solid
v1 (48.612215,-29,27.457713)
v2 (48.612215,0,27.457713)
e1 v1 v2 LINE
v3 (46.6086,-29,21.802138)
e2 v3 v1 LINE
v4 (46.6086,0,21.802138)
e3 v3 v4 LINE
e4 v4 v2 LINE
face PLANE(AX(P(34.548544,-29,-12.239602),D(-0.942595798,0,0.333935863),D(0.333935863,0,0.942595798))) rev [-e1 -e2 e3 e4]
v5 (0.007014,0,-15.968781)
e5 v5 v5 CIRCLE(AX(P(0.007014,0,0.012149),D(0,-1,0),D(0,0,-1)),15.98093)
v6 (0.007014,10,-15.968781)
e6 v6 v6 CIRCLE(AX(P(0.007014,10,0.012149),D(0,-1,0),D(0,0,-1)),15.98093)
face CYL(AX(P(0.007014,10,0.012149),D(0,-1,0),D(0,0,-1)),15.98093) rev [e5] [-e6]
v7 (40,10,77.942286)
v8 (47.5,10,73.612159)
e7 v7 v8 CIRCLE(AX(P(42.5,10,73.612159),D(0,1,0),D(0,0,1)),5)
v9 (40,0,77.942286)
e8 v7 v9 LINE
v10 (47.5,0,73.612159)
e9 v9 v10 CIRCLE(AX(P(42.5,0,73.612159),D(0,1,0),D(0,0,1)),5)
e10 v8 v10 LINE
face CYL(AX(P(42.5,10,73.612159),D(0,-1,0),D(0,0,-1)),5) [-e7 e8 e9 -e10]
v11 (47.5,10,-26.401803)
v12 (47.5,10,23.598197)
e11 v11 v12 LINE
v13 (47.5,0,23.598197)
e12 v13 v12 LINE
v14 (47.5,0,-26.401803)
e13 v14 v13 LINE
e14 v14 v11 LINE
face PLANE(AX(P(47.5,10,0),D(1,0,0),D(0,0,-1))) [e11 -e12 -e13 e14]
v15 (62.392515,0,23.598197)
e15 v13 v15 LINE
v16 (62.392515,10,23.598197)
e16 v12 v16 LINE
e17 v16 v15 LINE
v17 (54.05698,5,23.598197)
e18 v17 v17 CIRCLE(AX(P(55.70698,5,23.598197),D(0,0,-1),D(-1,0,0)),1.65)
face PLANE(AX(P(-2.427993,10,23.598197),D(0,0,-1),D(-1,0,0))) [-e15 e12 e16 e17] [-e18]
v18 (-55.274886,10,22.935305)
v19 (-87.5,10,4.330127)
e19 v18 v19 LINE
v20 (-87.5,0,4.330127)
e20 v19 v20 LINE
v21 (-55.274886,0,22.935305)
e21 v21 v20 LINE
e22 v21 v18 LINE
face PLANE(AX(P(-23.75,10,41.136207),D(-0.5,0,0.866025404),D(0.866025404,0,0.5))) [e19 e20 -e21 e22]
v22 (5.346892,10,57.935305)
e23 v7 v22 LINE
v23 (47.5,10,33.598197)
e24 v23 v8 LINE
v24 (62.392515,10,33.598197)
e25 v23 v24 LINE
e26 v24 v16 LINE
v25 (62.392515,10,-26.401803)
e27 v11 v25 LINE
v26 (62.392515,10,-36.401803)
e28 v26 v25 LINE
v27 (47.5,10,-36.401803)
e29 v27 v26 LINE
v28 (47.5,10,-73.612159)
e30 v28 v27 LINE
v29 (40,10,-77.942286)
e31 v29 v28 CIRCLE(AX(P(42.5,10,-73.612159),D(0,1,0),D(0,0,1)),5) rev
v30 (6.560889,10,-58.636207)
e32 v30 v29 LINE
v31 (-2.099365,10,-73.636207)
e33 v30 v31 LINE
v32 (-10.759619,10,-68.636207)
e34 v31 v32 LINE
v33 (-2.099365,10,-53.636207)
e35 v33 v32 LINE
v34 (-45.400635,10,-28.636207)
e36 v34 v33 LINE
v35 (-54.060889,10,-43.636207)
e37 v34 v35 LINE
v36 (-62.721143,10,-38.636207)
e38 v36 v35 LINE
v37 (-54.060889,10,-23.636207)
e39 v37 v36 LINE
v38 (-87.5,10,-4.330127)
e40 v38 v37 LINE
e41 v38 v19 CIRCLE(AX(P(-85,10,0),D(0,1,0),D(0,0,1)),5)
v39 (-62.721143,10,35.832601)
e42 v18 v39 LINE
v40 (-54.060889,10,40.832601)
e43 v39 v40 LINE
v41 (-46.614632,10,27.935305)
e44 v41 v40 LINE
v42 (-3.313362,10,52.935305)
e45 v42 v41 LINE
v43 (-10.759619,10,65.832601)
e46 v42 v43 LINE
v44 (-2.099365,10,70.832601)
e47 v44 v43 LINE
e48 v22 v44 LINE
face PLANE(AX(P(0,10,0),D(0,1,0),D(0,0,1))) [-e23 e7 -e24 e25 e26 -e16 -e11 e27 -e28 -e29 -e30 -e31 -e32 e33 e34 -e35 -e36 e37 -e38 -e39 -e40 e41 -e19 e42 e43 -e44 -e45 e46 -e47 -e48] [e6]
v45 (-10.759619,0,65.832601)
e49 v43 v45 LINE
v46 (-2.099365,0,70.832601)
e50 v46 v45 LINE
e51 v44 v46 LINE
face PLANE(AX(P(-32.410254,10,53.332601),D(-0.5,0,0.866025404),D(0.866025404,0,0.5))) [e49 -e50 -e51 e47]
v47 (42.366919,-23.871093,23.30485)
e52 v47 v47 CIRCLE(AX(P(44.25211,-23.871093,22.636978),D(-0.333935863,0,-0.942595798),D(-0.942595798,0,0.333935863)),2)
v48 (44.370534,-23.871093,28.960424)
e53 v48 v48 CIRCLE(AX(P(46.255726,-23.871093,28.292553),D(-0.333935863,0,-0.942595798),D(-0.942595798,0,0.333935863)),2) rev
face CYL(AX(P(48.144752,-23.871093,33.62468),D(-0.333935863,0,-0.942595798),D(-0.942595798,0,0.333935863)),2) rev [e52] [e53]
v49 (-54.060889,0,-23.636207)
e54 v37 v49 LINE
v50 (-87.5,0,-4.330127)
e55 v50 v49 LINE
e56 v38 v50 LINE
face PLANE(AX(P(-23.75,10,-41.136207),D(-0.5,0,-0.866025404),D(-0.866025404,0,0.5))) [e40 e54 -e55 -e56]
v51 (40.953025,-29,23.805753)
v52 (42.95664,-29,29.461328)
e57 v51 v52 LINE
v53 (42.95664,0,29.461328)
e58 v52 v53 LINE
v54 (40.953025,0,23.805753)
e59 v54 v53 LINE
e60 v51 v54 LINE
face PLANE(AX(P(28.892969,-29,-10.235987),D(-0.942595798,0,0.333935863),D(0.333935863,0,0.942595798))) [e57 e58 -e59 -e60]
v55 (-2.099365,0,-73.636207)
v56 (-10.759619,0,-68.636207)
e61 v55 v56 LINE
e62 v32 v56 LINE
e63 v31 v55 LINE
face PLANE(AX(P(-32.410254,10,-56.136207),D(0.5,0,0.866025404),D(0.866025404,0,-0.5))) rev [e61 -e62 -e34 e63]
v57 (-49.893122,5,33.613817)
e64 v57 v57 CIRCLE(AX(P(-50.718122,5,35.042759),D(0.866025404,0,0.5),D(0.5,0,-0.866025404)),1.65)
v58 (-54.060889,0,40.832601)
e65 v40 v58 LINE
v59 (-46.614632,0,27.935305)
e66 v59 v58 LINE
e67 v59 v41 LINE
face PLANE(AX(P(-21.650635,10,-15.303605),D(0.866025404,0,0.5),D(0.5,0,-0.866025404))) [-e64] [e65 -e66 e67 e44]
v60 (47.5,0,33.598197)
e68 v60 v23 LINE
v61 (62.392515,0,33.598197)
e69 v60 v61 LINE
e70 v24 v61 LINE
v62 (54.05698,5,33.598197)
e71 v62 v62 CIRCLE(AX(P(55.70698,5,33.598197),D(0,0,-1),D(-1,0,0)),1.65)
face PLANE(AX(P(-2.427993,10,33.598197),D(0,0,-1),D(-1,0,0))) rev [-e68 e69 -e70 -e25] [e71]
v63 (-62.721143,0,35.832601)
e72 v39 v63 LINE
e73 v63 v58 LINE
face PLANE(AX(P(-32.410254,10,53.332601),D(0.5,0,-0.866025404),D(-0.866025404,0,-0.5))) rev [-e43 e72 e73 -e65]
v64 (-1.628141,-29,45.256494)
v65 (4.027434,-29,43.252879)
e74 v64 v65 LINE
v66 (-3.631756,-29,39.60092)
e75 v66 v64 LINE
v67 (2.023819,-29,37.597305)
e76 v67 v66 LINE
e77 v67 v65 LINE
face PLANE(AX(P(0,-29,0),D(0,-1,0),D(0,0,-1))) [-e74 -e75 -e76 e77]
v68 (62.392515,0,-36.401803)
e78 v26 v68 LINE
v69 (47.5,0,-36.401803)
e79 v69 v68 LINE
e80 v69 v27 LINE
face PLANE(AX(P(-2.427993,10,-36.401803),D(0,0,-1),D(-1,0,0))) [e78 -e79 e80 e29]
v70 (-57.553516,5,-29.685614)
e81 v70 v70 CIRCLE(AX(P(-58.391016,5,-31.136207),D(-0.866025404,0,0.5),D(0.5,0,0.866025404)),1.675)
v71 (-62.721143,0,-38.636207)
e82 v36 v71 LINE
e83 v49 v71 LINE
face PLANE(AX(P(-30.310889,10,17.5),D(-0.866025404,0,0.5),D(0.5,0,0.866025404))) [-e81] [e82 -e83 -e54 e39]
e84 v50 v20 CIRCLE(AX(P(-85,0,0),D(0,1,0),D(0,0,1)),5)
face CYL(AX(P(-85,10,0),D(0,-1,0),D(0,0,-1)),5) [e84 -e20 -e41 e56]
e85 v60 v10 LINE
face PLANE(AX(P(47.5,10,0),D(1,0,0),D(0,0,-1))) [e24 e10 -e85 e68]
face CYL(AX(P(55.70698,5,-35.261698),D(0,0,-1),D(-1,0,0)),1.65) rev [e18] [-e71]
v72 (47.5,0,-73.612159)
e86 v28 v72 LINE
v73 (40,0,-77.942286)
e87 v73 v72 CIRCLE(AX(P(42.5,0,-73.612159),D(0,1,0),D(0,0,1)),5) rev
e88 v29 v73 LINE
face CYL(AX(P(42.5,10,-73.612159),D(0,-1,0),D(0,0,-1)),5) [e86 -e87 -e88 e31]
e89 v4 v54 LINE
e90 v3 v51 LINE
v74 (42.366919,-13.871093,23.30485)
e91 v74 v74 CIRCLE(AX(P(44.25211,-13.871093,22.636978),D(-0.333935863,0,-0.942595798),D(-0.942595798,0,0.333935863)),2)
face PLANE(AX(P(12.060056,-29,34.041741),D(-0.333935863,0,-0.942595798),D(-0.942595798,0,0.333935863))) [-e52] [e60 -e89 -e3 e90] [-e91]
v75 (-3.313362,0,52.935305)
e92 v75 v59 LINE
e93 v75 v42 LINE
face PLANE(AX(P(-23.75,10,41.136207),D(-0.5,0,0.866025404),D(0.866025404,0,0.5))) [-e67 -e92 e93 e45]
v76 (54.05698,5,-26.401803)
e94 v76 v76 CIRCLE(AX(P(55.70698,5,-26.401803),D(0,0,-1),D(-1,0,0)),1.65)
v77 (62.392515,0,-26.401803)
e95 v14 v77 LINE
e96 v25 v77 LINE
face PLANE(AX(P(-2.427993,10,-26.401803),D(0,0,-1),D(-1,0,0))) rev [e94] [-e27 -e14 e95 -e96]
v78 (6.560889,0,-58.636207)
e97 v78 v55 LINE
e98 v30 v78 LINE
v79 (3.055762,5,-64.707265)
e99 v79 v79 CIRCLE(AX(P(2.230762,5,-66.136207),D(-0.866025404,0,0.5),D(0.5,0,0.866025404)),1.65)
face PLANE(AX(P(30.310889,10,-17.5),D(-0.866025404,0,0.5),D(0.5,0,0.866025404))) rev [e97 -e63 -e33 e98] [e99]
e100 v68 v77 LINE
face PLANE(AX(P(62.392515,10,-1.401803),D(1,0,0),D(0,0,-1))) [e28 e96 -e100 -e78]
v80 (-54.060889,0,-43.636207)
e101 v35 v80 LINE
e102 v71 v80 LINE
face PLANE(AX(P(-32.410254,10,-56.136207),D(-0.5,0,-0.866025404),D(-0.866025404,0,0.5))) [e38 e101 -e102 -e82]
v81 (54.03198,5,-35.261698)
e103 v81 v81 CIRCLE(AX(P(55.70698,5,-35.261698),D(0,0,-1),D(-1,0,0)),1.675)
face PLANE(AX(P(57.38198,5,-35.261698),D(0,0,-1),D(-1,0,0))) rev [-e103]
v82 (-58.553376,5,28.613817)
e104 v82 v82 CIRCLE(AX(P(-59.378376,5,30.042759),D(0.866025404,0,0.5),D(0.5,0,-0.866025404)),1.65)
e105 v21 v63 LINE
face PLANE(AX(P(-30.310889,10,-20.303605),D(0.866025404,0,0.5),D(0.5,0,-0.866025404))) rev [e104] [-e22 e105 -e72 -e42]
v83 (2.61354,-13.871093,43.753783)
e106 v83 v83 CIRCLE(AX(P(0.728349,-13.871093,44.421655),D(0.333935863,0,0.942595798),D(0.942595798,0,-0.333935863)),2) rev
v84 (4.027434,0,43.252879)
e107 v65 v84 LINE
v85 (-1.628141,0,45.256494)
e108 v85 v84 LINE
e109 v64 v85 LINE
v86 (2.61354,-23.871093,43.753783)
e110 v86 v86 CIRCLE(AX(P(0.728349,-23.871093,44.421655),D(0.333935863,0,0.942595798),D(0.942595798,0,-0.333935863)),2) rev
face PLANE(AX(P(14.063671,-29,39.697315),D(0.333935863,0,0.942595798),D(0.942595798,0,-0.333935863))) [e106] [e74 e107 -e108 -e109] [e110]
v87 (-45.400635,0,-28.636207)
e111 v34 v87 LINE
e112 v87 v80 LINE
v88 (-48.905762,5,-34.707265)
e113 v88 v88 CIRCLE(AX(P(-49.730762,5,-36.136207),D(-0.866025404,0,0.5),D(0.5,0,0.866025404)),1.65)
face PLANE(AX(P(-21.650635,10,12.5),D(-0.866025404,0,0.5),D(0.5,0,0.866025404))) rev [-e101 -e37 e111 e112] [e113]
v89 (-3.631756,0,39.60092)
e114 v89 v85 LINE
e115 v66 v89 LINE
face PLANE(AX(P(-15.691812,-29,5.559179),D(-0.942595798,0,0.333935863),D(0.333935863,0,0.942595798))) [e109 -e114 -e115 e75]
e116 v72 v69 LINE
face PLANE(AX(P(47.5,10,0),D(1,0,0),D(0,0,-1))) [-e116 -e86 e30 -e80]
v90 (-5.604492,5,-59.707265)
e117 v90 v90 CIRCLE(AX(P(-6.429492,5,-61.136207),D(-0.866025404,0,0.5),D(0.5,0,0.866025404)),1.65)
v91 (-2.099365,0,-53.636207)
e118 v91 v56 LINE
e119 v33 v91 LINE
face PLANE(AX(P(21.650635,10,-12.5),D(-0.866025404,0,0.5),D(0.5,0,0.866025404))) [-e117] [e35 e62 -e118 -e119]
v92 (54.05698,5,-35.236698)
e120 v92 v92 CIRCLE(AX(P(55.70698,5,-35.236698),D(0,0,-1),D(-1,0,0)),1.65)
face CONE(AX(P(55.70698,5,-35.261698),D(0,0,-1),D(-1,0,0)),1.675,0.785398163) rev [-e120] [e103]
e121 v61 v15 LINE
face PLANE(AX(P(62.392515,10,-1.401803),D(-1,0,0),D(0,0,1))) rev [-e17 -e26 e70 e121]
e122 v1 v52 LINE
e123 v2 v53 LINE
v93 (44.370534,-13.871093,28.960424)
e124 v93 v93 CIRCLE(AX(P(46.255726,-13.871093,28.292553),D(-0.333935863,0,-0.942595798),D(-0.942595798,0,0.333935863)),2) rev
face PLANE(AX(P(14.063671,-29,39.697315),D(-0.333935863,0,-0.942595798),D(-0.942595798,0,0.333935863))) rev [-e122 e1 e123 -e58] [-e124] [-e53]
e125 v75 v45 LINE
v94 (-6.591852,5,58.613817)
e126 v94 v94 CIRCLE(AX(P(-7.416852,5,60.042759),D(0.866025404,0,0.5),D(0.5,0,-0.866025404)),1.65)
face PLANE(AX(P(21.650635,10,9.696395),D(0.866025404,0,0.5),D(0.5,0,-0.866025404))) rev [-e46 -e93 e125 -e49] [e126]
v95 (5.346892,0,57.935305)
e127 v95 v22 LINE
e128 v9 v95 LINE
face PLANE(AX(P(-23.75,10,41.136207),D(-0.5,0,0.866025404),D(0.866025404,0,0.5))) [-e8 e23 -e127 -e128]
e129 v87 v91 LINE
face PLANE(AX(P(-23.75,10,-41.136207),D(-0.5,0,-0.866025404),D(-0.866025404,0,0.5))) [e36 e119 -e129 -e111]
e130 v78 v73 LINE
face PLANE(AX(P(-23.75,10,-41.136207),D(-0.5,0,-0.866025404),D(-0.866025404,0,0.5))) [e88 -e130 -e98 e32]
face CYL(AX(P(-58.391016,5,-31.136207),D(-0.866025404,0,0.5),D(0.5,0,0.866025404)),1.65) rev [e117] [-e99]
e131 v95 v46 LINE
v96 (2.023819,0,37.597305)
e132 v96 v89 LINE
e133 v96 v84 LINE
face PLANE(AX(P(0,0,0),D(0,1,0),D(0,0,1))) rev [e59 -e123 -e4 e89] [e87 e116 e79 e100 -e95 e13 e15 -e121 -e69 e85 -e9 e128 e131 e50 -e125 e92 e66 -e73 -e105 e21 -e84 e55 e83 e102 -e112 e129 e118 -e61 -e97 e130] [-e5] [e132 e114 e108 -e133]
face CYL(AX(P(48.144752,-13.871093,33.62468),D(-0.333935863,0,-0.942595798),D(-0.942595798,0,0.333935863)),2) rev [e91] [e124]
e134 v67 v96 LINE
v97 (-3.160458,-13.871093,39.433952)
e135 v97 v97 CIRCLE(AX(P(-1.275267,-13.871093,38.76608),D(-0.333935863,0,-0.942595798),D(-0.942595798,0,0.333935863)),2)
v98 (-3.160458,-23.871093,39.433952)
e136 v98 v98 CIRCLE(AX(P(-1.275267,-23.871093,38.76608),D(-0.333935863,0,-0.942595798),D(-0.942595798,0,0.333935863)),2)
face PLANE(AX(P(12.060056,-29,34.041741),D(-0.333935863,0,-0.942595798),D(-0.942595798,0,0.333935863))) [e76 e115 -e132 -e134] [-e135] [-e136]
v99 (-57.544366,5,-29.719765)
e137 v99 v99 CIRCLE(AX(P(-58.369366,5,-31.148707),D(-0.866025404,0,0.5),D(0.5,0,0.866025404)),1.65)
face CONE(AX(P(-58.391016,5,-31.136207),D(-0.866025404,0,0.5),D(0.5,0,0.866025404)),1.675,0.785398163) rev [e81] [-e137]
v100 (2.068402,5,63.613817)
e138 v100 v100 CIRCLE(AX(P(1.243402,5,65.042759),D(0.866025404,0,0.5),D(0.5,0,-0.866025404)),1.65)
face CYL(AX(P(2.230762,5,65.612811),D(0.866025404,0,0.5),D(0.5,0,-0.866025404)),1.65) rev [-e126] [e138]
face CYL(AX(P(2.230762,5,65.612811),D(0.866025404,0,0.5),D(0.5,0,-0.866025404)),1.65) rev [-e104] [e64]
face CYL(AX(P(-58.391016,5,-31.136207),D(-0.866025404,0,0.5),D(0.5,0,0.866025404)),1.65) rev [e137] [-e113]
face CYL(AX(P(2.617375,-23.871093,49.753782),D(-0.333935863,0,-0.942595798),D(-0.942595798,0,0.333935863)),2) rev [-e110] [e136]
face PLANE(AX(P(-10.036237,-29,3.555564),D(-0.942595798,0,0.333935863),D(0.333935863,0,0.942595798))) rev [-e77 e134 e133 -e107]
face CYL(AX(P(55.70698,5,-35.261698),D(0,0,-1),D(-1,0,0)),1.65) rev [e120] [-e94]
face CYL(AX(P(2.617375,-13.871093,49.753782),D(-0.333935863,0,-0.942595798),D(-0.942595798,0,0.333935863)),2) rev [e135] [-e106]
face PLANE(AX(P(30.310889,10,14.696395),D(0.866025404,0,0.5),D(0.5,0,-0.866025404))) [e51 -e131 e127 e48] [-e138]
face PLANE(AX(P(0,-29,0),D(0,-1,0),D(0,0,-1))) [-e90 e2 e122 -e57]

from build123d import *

# Parameters (mm, degrees)
BOSS_EXTRUDE1_DEPTH               = 10
BOSS_EXTRUDE3_DEPTH               = 10
TAP_DRILL_FOR_M4_TAP1_D           = 3.3
TAP_DRILL_FOR_M4_TAP1_CSINK_D     = 3.35
TAP_DRILL_FOR_M4_TAP1_CSINK_ANGLE = 90
CIRPATTERN1_OUTLINE_W             = 0.025
CIRPATTERN1_OUTLINE_H             = 10
CIRPATTERN1_START                 = -36.401802592
CIRPATTERN1_2_OUTLINE_W           = 14.892514764
CIRPATTERN1_2_OUTLINE_H           = 10
CIRPATTERN1_2_OUTLINE_R           = 1.675
CIRPATTERN1_2_DEPTH               = 10
CIRPATTERN1_START_2               = 23.598197408
CIRPATTERN1_3_OUTLINE_W           = 14.892514764
CIRPATTERN1_3_OUTLINE_H           = 10
CIRPATTERN1_3_OUTLINE_R           = 1.675
CIRPATTERN1_3_DEPTH               = 10
CIRPATTERN1_4_OUTLINE_R           = 1.675
CIRPATTERN1_4_DEPTH               = 1.140104786
CIRPATTERN1_5_OUTLINE_W           = 14.892514764
CIRPATTERN1_5_OUTLINE_H           = 10
CIRPATTERN1_5_OUTLINE_R           = 1.65
CIRPATTERN1_5_DEPTH               = 10
CIRPATTERN1_6_OUTLINE_W           = 14.892514764
CIRPATTERN1_6_OUTLINE_H           = 10
CIRPATTERN1_6_OUTLINE_R           = 1.65
CIRPATTERN1_6_DEPTH               = 10
SKETCH13_R                        = 15.980929879
CUT_EXTRUDE1_DEPTH                = 120.91610231
BOSS_EXTRUDE4_DEPTH               = 29
SKETCH16_R                        = 2
CUT_EXTRUDE2_DEPTH                = 6
SKETCH17_R                        = 2
CUT_EXTRUDE3_DEPTH                = 6


with BuildPart() as part:
    # Sketch2 → Boss-Extrude1 (new body)
    with BuildSketch(Plane(origin=(0, 0, 0), x_dir=(0, 0, -1), z_dir=(0, 1, 0))):
        with BuildLine():
            Line((-58.63620668, -6.560889132), (-77.942286341, -40))
            ThreePointArc((-77.942286341, -40), (-77.942286341, -45), (-73.612159322, -47.5))
            Line((-73.612159322, -47.5), (-35, -47.5))
            Line((-35, -47.5), (-25, -47.5))
            Line((-25, -47.5), (25, -47.5))
            Line((25, -47.5), (35, -47.5))
            Line((35, -47.5), (73.612159322, -47.5))
            ThreePointArc((73.612159322, -47.5), (77.942286341, -45), (77.942286341, -40))
            Line((77.942286341, -40), (58.63620668, -6.560889132))
            Line((58.63620668, -6.560889132), (53.63620668, 2.099364905))
            Line((53.63620668, 2.099364905), (28.63620668, 45.400635095))
            Line((28.63620668, 45.400635095), (23.63620668, 54.060889132))
            Line((23.63620668, 54.060889132), (4.330127019, 87.5))
            ThreePointArc((4.330127019, 87.5), (0, 90), (-4.330127019, 87.5))
            Line((-4.330127019, 87.5), (-23.63620668, 54.060889132))
            Line((-23.63620668, 54.060889132), (-28.63620668, 45.400635095))
            Line((-28.63620668, 45.400635095), (-53.63620668, 2.099364905))
            Line((-53.63620668, 2.099364905), (-58.63620668, -6.560889132))
        make_face()
    extrude(amount=BOSS_EXTRUDE1_DEPTH)

    # Sketch2<7> → Boss-Extrude3 (add)
    with BuildSketch(Plane(origin=(0, 0, 0), x_dir=(0, 0, -1), z_dir=(0, 1, 0))):
        Polygon((58.63620668, -6.560889132), (53.63620668, 2.099364905), (68.63620668, 10.759618943), (73.63620668, 2.099364905), align=None)
        Polygon((23.63620668, 54.060889132), (38.63620668, 62.72114317), (43.63620668, 54.060889132), (28.63620668, 45.400635095), align=None)
    extrude(amount=BOSS_EXTRUDE3_DEPTH)

    # Tap Drill for M4 Tap1 (through all)
    with Locations(Plane(origin=(-30.310889132, 0, 17.5), x_dir=(0.49999999999999517, 0, 0.8660254037844415), z_dir=(-0.8660254037844414, 0, 0.4999999999999951))):
        with Locations((-56.160254038, 5)):
            CounterSinkHole(TAP_DRILL_FOR_M4_TAP1_D / 2, TAP_DRILL_FOR_M4_TAP1_CSINK_D / 2, counter_sink_angle=TAP_DRILL_FOR_M4_TAP1_CSINK_ANGLE)



with BuildPart() as body_2:
    # CirPattern1: read off the stored shape, not the designer's step
    # CirPattern1 outline → CirPattern1 (revolve)
    with BuildSketch(Plane(origin=(55.706980142, 5, 0), x_dir=(1, 0, 0), z_dir=(0, -1, 0))):
        with Locations((1.6625, 28.598197408)):
            Rectangle(CIRPATTERN1_OUTLINE_W, CIRPATTERN1_OUTLINE_H)
        Polygon((1.675, -26.401802592), (1.65, -26.401802592), (1.65, -35.236697806), (1.675, -35.261697806), align=None)
    revolve(axis=Axis((55.706980142, 5, 0), (0, 0, 1)))


with BuildPart() as part_1:
    add(part.part)

    add(body_2.part)  # CirPattern1 2 merges body 2
    # CirPattern1 2 outline → CirPattern1 2 (add)
    with BuildSketch(Plane.XY.offset(CIRPATTERN1_START)):
        with Locations((54.946257382, 5)):
            Rectangle(CIRPATTERN1_2_OUTLINE_W, CIRPATTERN1_2_OUTLINE_H)
        with Locations((55.706980142, 5)):
            Circle(CIRPATTERN1_2_OUTLINE_R, mode=Mode.SUBTRACT)
    extrude(amount=CIRPATTERN1_2_DEPTH)

    # CirPattern1 3 outline → CirPattern1 3 (add)
    with BuildSketch(Plane.XY.offset(CIRPATTERN1_START_2)):
        with Locations((54.946257382, 5)):
            Rectangle(CIRPATTERN1_3_OUTLINE_W, CIRPATTERN1_3_OUTLINE_H)
        with Locations((55.706980142, 5)):
            Circle(CIRPATTERN1_3_OUTLINE_R, mode=Mode.SUBTRACT)
    extrude(amount=CIRPATTERN1_3_DEPTH)

    # CirPattern1 4 outline → CirPattern1 4 (add)
    with BuildSketch(Plane.XY.offset(CIRPATTERN1_START)):
        with Locations((55.706980142, 5)):
            Circle(CIRPATTERN1_4_OUTLINE_R)
    extrude(amount=CIRPATTERN1_4_DEPTH)

    # CirPattern1 5 outline → CirPattern1 5 (add)
    with BuildSketch(Plane(origin=(0, 0, 0), x_dir=(0.500000000000001, 0, -0.866025403784438), z_dir=(0.866025403784438, 0, 0.500000000000001)).offset(CIRPATTERN1_START)):
        with Locations((-54.946257382, 5)):
            Rectangle(CIRPATTERN1_5_OUTLINE_W, CIRPATTERN1_5_OUTLINE_H)
        with Locations((-55.706980142, 5)):
            Circle(CIRPATTERN1_5_OUTLINE_R, mode=Mode.SUBTRACT)
    extrude(amount=CIRPATTERN1_5_DEPTH)

    # CirPattern1 6 outline → CirPattern1 6 (add)
    with BuildSketch(Plane(origin=(0, 0, 0), x_dir=(0.500000000000001, 0, -0.866025403784438), z_dir=(0.866025403784438, 0, 0.500000000000001)).offset(CIRPATTERN1_START_2)):
        with Locations((-54.946257382, 5)):
            Rectangle(CIRPATTERN1_6_OUTLINE_W, CIRPATTERN1_6_OUTLINE_H)
        with Locations((-55.706980142, 5)):
            Circle(CIRPATTERN1_6_OUTLINE_R, mode=Mode.SUBTRACT)
    extrude(amount=CIRPATTERN1_6_DEPTH)

    # Sketch13 → Cut-Extrude1 (cut, through all)
    with BuildSketch(Plane.XZ):
        with Locations(Location((0.00701443, 0.012149349, 0), (0, 0, 270))):
            Circle(SKETCH13_R)
    extrude(amount=-CUT_EXTRUDE1_DEPTH, mode=Mode.SUBTRACT)

    # Sketch15 → Boss-Extrude4 (add)
    with BuildSketch(Plane.XZ):
        Polygon((-3.631756095, 39.600919679), (-3.160458196, 39.433951748), (2.023818696, 37.5973045), (4.027433875, 43.252879291), (-1.628140916, 45.25649447), align=None)
        Polygon((46.137302064, 21.969106104), (46.608599963, 21.802138173), (48.612215142, 27.457712963), (42.956640351, 29.461328142), (40.953025172, 23.805753352), align=None)
    extrude(amount=BOSS_EXTRUDE4_DEPTH)

    # Sketch16 → Cut-Extrude2 (cut)
    with BuildSketch(Plane(origin=(12.06005593, 0, 34.041740653), x_dir=(-0.9425957984699193, 0, 0.3339358631636553), z_dir=(-0.33393586316365526, 0, -0.9425957984699191))):
        with Locations((-34.152554668, -23.871092604)):
            Circle(SKETCH16_R)
        with Locations((-34.152554668, -13.871092604)):
            Circle(SKETCH16_R)
    extrude(amount=-CUT_EXTRUDE2_DEPTH, mode=Mode.SUBTRACT)

    # Sketch17 → Cut-Extrude3 (cut)
    with BuildSketch(Plane(origin=(12.06005593, 0, 34.041740653), x_dir=(-0.9425957984699224, 0, 0.33393586316364626), z_dir=(-0.33393586316364626, 0, -0.9425957984699224))):
        with Locations((14.147445332, -23.871092604)):
            Circle(SKETCH17_R)
        with Locations((14.147445332, -13.871092604)):
            Circle(SKETCH17_R)
    extrude(amount=-CUT_EXTRUDE3_DEPTH, mode=Mode.SUBTRACT)


solid = part_1.part
